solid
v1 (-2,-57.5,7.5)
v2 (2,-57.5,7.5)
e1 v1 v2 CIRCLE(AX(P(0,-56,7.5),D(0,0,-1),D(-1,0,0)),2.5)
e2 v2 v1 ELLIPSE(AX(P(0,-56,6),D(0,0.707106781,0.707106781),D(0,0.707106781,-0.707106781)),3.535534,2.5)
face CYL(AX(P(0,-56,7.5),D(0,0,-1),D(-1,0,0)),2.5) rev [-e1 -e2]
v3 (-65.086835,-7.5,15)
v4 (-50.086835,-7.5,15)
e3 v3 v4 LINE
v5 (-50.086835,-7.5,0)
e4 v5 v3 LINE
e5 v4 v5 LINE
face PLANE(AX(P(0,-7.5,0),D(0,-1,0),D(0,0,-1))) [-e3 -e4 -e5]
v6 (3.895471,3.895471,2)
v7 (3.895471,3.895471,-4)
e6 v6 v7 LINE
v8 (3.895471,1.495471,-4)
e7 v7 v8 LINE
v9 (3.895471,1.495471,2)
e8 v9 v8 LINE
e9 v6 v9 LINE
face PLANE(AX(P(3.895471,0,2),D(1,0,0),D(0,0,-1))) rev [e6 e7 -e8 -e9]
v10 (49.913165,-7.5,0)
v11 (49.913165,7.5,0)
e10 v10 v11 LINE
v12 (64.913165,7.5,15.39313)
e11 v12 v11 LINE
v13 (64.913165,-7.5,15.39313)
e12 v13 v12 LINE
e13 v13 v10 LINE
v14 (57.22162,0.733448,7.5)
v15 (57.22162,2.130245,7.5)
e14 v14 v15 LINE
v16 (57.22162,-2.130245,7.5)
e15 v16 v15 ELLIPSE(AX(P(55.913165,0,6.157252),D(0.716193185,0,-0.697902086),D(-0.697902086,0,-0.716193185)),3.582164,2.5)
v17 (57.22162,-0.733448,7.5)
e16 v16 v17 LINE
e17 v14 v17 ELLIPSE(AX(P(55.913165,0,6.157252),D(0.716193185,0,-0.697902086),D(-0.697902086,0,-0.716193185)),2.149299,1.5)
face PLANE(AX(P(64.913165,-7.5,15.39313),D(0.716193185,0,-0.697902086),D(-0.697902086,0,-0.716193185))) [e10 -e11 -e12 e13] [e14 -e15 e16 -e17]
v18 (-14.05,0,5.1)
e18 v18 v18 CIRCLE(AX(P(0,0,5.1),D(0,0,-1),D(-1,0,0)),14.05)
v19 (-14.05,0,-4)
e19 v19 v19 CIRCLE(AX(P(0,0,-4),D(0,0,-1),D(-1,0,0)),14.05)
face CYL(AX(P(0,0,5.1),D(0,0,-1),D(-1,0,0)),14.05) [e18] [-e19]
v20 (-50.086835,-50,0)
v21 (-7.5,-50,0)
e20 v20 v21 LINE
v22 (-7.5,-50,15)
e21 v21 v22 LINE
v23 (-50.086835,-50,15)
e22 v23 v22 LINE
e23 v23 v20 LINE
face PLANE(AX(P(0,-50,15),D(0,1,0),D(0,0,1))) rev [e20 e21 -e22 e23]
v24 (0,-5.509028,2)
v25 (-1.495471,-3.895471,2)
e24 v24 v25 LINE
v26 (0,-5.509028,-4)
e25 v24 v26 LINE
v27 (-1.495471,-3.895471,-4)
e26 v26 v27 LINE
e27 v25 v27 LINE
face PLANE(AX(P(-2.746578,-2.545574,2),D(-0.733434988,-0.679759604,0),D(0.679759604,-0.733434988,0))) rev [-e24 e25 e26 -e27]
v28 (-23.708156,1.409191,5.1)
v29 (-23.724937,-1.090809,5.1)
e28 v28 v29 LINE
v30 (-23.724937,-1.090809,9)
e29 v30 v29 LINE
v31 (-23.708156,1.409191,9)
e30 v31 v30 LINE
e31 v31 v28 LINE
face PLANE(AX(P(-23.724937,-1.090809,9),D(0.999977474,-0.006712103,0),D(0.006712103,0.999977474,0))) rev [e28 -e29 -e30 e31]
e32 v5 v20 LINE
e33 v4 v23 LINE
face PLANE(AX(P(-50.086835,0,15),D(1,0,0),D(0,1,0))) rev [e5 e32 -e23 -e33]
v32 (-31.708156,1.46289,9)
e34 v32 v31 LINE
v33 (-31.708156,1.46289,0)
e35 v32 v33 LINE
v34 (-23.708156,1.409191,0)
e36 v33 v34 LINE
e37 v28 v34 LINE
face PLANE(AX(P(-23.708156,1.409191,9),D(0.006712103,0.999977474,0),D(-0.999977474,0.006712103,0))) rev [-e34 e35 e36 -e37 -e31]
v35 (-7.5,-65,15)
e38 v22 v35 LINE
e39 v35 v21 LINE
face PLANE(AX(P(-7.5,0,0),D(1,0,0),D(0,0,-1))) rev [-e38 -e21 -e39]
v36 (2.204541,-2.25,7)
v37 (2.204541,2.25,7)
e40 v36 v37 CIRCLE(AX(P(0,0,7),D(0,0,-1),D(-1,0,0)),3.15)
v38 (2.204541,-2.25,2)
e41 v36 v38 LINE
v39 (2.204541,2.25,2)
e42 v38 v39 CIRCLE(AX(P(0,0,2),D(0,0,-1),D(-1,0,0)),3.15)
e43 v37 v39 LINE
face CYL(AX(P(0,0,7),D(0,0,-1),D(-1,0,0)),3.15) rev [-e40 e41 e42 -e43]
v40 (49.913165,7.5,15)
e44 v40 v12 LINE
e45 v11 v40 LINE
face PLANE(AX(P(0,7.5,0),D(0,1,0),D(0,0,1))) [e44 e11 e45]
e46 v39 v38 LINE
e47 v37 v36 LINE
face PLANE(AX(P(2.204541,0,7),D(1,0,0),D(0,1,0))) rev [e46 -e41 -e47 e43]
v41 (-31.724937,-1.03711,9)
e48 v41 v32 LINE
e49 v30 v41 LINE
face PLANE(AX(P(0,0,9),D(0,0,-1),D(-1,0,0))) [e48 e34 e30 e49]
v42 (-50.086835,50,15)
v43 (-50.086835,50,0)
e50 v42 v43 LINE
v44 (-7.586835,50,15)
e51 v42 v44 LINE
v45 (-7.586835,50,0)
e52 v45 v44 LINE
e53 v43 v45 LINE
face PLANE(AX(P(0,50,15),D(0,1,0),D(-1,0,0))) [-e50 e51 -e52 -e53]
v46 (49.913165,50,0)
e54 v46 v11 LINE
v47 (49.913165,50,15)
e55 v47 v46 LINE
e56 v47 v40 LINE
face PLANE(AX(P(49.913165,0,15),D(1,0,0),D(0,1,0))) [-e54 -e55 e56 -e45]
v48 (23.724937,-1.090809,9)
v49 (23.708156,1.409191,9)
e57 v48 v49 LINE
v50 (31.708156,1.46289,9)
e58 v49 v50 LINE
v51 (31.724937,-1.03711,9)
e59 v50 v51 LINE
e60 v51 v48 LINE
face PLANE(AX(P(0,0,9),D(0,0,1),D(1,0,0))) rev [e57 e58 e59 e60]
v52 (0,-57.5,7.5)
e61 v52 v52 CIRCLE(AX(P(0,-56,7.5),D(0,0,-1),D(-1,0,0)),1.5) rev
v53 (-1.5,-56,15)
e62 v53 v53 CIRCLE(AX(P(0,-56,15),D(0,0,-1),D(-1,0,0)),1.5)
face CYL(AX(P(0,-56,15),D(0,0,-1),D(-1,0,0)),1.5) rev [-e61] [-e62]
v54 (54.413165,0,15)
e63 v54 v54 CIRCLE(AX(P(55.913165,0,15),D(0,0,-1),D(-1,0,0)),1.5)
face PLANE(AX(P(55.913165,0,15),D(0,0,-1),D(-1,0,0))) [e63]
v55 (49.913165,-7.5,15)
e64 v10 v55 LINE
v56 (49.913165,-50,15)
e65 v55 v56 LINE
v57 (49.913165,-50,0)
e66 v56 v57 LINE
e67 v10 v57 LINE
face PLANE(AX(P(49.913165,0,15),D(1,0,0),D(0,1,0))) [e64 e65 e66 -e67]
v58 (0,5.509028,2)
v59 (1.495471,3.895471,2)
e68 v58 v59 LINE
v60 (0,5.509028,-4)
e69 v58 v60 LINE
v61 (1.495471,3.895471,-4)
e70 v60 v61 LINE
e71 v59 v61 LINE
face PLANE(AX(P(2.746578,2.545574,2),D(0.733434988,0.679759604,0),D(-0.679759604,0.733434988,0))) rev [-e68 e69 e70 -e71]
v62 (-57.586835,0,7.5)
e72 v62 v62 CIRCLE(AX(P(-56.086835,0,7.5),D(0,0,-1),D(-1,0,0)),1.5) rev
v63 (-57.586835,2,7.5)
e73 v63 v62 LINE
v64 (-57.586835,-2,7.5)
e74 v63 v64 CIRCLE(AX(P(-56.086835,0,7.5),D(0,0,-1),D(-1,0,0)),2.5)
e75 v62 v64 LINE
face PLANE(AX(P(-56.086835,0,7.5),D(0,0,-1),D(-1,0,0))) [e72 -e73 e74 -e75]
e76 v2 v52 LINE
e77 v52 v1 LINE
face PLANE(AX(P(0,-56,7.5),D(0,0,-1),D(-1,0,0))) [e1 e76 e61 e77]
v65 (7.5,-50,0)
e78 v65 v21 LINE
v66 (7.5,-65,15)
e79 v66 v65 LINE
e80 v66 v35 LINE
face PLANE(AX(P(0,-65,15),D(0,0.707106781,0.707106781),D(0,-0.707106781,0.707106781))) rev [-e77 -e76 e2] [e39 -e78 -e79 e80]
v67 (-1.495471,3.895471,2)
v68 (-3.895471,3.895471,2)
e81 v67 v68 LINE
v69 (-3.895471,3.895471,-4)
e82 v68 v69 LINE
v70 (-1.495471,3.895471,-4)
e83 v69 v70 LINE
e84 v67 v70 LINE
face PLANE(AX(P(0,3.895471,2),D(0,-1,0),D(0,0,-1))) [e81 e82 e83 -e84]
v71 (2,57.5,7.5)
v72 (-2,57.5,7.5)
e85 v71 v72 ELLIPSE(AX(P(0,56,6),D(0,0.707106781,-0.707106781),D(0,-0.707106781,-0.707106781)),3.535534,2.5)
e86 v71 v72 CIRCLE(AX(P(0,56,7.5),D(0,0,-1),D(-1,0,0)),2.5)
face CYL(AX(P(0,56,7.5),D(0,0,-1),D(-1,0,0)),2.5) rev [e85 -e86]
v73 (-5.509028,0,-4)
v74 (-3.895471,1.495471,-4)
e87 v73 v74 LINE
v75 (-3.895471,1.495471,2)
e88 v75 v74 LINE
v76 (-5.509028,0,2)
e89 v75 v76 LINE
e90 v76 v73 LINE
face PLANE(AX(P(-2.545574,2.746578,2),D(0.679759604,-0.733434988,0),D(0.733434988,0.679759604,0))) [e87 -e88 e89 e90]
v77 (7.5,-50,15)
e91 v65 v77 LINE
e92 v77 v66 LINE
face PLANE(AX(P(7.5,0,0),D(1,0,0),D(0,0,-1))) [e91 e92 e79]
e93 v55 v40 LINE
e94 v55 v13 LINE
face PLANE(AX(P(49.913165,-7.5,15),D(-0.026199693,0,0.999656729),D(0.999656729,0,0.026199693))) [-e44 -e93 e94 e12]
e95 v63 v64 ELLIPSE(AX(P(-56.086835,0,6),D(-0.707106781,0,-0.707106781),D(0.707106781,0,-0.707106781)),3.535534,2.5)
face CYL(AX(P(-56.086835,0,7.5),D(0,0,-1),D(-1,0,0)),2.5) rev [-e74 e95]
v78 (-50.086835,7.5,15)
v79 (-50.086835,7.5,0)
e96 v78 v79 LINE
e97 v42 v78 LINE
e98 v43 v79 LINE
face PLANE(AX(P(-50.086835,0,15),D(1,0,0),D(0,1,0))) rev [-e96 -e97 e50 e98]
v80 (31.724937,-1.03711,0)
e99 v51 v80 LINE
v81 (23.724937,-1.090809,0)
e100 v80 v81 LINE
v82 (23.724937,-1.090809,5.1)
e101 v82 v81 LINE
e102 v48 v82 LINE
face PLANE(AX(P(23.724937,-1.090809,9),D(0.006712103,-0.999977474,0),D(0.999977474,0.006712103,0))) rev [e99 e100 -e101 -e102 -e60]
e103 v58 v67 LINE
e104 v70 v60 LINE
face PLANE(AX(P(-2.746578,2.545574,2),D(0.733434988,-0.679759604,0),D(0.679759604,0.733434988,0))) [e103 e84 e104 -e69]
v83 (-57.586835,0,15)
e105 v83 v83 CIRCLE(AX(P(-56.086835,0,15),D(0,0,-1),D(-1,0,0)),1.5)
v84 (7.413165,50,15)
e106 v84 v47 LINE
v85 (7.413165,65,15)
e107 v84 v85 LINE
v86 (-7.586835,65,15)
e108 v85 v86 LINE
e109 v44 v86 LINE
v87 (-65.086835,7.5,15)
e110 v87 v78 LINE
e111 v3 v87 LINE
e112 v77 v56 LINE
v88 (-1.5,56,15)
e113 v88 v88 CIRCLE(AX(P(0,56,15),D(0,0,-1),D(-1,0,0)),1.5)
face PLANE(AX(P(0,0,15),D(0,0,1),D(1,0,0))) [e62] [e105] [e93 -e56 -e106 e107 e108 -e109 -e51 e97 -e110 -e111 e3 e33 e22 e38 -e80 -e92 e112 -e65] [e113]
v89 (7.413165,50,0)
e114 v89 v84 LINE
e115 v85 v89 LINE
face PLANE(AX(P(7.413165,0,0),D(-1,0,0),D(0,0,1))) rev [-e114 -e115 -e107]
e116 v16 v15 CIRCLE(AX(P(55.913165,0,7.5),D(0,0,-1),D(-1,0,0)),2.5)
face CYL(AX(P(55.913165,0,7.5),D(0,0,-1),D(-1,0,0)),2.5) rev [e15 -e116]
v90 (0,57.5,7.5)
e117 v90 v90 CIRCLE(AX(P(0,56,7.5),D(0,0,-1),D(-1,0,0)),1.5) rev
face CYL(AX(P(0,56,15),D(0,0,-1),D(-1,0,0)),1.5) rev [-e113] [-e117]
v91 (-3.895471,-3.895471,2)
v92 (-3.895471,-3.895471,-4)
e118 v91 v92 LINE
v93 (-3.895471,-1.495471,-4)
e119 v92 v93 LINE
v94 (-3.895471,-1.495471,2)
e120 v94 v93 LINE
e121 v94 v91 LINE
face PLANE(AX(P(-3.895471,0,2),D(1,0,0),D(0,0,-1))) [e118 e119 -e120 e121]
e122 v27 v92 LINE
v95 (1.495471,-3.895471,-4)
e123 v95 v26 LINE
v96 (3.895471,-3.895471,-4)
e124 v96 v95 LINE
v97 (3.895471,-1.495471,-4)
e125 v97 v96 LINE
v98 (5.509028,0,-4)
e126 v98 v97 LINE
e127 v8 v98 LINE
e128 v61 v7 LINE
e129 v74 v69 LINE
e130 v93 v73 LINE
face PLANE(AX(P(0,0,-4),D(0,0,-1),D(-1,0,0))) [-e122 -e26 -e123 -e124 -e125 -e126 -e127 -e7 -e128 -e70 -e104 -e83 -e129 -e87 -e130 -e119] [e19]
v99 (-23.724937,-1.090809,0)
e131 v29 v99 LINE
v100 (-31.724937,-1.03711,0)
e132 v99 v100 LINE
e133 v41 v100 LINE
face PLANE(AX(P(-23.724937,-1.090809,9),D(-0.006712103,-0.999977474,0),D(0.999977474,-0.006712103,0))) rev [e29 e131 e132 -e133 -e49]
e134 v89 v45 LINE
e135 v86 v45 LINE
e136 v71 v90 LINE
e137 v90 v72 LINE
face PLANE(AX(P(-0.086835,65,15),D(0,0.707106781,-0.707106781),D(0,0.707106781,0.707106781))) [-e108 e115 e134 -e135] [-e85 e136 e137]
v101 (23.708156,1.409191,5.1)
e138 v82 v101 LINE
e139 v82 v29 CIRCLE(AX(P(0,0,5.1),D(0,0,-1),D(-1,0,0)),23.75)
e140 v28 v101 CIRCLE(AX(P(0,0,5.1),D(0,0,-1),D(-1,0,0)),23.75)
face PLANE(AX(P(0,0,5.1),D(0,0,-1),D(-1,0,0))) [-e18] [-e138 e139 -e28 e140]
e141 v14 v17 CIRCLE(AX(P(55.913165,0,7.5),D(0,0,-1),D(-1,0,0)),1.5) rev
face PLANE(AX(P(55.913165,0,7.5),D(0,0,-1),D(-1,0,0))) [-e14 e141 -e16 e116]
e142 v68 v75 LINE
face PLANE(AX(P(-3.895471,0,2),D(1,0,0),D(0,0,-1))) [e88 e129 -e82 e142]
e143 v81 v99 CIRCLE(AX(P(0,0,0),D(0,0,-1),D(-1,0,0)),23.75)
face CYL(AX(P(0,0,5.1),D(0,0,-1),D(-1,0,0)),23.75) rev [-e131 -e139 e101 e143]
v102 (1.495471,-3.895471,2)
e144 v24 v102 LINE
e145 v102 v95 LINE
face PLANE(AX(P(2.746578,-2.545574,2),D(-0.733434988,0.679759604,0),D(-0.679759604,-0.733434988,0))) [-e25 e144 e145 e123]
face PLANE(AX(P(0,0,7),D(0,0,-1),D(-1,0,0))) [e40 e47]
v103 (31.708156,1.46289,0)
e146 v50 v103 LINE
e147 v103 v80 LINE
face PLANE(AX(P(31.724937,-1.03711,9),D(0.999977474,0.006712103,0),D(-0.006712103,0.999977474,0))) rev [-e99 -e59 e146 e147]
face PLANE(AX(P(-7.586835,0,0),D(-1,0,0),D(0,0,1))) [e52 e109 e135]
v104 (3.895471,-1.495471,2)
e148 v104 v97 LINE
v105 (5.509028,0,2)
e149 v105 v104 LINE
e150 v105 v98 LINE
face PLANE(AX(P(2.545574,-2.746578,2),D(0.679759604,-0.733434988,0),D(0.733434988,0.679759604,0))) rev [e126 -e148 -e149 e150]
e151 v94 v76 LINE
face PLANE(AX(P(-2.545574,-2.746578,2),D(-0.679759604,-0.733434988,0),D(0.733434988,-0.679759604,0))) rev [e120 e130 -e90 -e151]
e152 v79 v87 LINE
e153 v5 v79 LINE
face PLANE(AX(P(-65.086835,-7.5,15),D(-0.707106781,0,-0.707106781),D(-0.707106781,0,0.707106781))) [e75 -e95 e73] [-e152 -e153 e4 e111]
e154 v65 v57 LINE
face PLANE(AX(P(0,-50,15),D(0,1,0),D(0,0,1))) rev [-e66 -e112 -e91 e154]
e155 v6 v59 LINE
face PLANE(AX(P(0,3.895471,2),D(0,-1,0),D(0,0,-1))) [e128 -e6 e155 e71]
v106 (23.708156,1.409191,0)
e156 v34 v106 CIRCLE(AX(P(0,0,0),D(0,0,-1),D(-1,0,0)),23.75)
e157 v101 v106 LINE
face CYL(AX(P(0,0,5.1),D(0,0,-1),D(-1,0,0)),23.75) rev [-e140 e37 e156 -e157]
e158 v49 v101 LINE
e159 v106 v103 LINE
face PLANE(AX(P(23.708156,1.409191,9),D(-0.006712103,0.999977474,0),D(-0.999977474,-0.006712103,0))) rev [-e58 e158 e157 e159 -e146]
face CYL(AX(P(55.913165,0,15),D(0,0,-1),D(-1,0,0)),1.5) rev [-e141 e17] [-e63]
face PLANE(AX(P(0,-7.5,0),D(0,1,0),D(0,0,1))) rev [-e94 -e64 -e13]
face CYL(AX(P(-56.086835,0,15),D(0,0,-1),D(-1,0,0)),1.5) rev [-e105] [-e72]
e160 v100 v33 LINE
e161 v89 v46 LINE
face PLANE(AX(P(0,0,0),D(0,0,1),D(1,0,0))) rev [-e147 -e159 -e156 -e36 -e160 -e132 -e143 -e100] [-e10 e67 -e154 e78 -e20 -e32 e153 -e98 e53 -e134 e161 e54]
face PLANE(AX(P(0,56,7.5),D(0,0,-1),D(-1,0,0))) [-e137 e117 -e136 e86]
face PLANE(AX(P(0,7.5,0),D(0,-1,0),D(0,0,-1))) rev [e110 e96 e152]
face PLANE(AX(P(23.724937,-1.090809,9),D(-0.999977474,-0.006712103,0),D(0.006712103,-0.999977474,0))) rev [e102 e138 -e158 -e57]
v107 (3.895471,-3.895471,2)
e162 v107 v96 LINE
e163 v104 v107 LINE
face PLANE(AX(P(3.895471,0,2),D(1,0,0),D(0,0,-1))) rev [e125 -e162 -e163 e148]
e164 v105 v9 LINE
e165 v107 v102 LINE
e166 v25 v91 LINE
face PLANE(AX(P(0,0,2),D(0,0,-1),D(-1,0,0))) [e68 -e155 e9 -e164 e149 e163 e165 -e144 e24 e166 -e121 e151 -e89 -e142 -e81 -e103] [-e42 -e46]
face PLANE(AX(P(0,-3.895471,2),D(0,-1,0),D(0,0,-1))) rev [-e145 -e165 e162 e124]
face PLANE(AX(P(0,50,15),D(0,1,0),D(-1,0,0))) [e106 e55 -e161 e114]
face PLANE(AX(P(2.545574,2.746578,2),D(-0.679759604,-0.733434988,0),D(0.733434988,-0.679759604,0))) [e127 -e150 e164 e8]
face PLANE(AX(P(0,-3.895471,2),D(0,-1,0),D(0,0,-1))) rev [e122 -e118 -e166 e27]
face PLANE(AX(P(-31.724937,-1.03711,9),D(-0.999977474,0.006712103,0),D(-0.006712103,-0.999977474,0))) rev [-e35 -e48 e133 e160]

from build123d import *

# Parameters (mm, degrees)
BOSS_EXTRU_1_DEPTH      = 15
BOSS_EXTRU_2_START      = -7.5
BOSS_EXTRU_2_DEPTH      = 14.913164891
BOSS_EXTRU_2_START_2    = -7.586835109
BOSS_EXTRU_2_2_DEPTH    = 0.086835109
BOSS_EXTRU_2_START_3    = 7.413164891
BOSS_EXTRU_2_3_DEPTH    = 0.086835109
BOSS_EXTRU_3_DEPTH      = 7.5
BOSS_EXTRU_3_DEPTH_BACK = 7.5
ESQUISSE6_R             = 1.5
ENL_V_MAT_EXTRU_1_DEPTH = 15
ESQUISSE7_R             = 2.5
ENL_V_MAT_EXTRU_2_DEPTH = 7.5
ESQUISSE8_R             = 23.75
ESQUISSE8_R_2           = 14.05
ENL_V_MAT_EXTRU_3_DEPTH = 5.1
ENL_V_MAT_EXTRU_4_DEPTH = 9
ESQUISSE15_W            = 7.790942256
ESQUISSE15_H            = 7.790942256
ESQUISSE15_R            = 3
ENL_V_MAT_EXTRU_5_DEPTH = 2
ENL_V_MAT_EXTRU_6_DEPTH = 5
BOSS_EXTRU_6_START      = 4
ESQUISSE18_R            = 14.05
BOSS_EXTRU_6_DEPTH      = 4


# Read off the part's stored shape, not the designer's step: Boss.-Extru.2
with BuildPart() as part:
    # Esquisse1 → Boss.-Extru.1 (new body)
    with BuildSketch(Plane.XY):
        Polygon((49.913164891, 50), (-50.086835109, 50), (-50.086835109, 0), (-50.086835109, -50), (49.913164891, -50), (49.913164891, 0), align=None)
    extrude(amount=BOSS_EXTRU_1_DEPTH)

    # Boss.-Extru.2 outline → Boss.-Extru.2 (add)
    with BuildSketch(Plane.YZ.offset(BOSS_EXTRU_2_START)):
        Polygon((50, 0), (65, 15), (50, 15), align=None)
        Polygon((-50, 0), (-50, 15), (-65, 15), align=None)
    extrude(amount=BOSS_EXTRU_2_DEPTH)

    # Boss.-Extru.2 2 outline → Boss.-Extru.2 2 (add)
    with BuildSketch(Plane.YZ.offset(BOSS_EXTRU_2_START_2)):
        Polygon((50, 0), (65, 15), (50, 15), align=None)
    extrude(amount=BOSS_EXTRU_2_2_DEPTH)

    # Boss.-Extru.2 3 outline → Boss.-Extru.2 3 (add)
    with BuildSketch(Plane.YZ.offset(BOSS_EXTRU_2_START_3)):
        Polygon((-50, 0), (-50, 15), (-65, 15), align=None)
    extrude(amount=BOSS_EXTRU_2_3_DEPTH)

    # Esquisse4 → Boss.-Extru.3 (add, two sides: drawn at the far end of the back side and taken through both)
    with BuildSketch(Plane(origin=(0, 0, 0), x_dir=(1, 0, 0), z_dir=(0, 1, 0)).offset(-BOSS_EXTRU_3_DEPTH_BACK)):
        Polygon((-50.086835109, 0), (-50.086835109, -15), (-65.086835109, -15), align=None)
        Polygon((49.913164891, 0), (49.913164891, -15), (64.913164891, -15.393130345), align=None)
    extrude(amount=BOSS_EXTRU_3_DEPTH + BOSS_EXTRU_3_DEPTH_BACK)

    # Esquisse6 → Enlèv. mat.-Extru.1 (cut)
    with BuildSketch(Plane(origin=(0, 0, 0), x_dir=(-1, 0, 0), z_dir=(0, 0, -1))):
        with Locations((0, -56)):
            Circle(ESQUISSE6_R)
        with Locations((56.086835109, 0)):
            Circle(ESQUISSE6_R)
        with Locations((0, 56)):
            Circle(ESQUISSE6_R)
        with Locations((-55.913164891, 0)):
            Circle(ESQUISSE6_R)
    extrude(amount=-ENL_V_MAT_EXTRU_1_DEPTH, mode=Mode.SUBTRACT)

    # Esquisse7 → Enlèv. mat.-Extru.2 (cut)
    with BuildSketch(Plane(origin=(0, 0, 0), x_dir=(-1, 0, 0), z_dir=(0, 0, -1))):
        with Locations((56.086835109, 0)):
            Circle(ESQUISSE7_R)
        with Locations((0, 56)):
            Circle(ESQUISSE7_R)
        with Locations((-55.913164891, 0)):
            Circle(ESQUISSE7_R)
        with Locations((0, -56)):
            Circle(ESQUISSE7_R)
    extrude(amount=-ENL_V_MAT_EXTRU_2_DEPTH, mode=Mode.SUBTRACT)

    # Esquisse8 → Enlèv. mat.-Extru.3 (cut)
    with BuildSketch(Plane(origin=(0, 0, 0), x_dir=(-1, 0, 0), z_dir=(0, 0, -1))):
        Circle(ESQUISSE8_R)
        Circle(ESQUISSE8_R_2, mode=Mode.SUBTRACT)
    extrude(amount=-ENL_V_MAT_EXTRU_3_DEPTH, mode=Mode.SUBTRACT)

    # Esquisse11 → Enlèv. mat.-Extru.4 (cut)
    with BuildSketch(Plane(origin=(0, 0, 0), x_dir=(-1, 0, 0), z_dir=(0, 0, -1))):
        Polygon((23.724937024, -1.090808521), (23.708156389, 1.409191479), (31.708156389, 1.462889508), (31.724937024, -1.037110492), align=None)
        Polygon((-31.724937024, -1.037110492), (-31.708156389, 1.462889508), (-23.708156389, 1.409191479), (-23.724937024, -1.090808521), align=None)
    extrude(amount=-ENL_V_MAT_EXTRU_4_DEPTH, mode=Mode.SUBTRACT)

    # Esquisse15 → Enlèv. mat.-Extru.5 (cut)
    # profile 1 of 7: a face of its own
    with BuildSketch(Plane(origin=(0, 0, 0), x_dir=(-1, 0, 0), z_dir=(0, 0, -1))):
        Polygon((0, 5.509028101), (-1.495471128, 3.895471128), (1.495471128, 3.895471128), align=None)
    # profile 2 of 7: a face of its own
    with BuildSketch(Plane(origin=(0, 0, 0), x_dir=(-1, 0, 0), z_dir=(0, 0, -1))):
        Polygon((-3.895471128, -1.495471128), (-3.895471128, 1.495471128), (-5.509028101, 0), align=None)
    # profile 3 of 7: a face of its own
    with BuildSketch(Plane(origin=(0, 0, 0), x_dir=(-1, 0, 0), z_dir=(0, 0, -1))):
        Polygon((1.495471128, -3.895471128), (-1.495471128, -3.895471128), (0, -5.509028101), align=None)
    # profile 4 of 7: a face of its own
    with BuildSketch(Plane(origin=(0, 0, 0), x_dir=(-1, 0, 0), z_dir=(0, 0, -1))):
        Polygon((5.509028101, 0), (3.895471128, 1.495471128), (3.895471128, -1.495471128), align=None)
    # profile 5 of 7: a face of its own
    with BuildSketch(Plane(origin=(0, 0, 0), x_dir=(-1, 0, 0), z_dir=(0, 0, -1))):
        Rectangle(ESQUISSE15_W, ESQUISSE15_H)
        Circle(ESQUISSE15_R, mode=Mode.SUBTRACT)
    # profile 6 of 7: a face of its own
    with BuildSketch(Plane(origin=(0, 0, 0), x_dir=(-1, 0, 0), z_dir=(0, 0, -1))):
        with BuildLine():
            ThreePointArc((3, 0), (0.776457135, 2.897777479), (-2.598076211, 1.5))
            Line((-2.598076211, 1.5), (-2.598076211, -1.5))
            ThreePointArc((-2.598076211, -1.5), (0.776457135, -2.897777479), (3, 0))
        make_face()
    # profile 7 of 7: a face of its own
    with BuildSketch(Plane(origin=(0, 0, 0), x_dir=(-1, 0, 0), z_dir=(0, 0, -1))):
        with BuildLine():
            Line((-2.598076211, -1.5), (-2.598076211, 1.5))
            ThreePointArc((-2.598076211, 1.5), (-3, 0), (-2.598076211, -1.5))
        make_face()
    extrude(amount=-ENL_V_MAT_EXTRU_5_DEPTH, mode=Mode.SUBTRACT)

    # Esquisse17 → Enlèv. mat.-Extru.6 (cut)
    with BuildSketch(Plane(origin=(0, 0, 2), x_dir=(-1, 0, 0), z_dir=(0, 0, -1))):
        with BuildLine():
            ThreePointArc((3.15, 0), (1.220286151, 2.904031975), (-2.204540769, 2.25))
            Line((-2.204540769, 2.25), (-2.204540769, -2.25))
            ThreePointArc((-2.204540769, -2.25), (1.220286151, -2.904031975), (3.15, 0))
        make_face()
    extrude(amount=-ENL_V_MAT_EXTRU_6_DEPTH, mode=Mode.SUBTRACT)

    # Esquisse18 → Boss.-Extru.6 (add)
    with BuildSketch(Plane(origin=(0, 0, 0), x_dir=(-1, 0, 0), z_dir=(0, 0, -1)).offset(BOSS_EXTRU_6_START)):
        Circle(ESQUISSE18_R)
        Polygon((0, 5.509028101), (1.495471128, 3.895471128), (3.895471128, 3.895471128), (3.895471128, 1.495471128), (5.509028101, 0), (3.895471128, -1.495471128), (3.895471128, -3.895471128), (1.495471128, -3.895471128), (0, -5.509028101), (-1.495471128, -3.895471128), (-3.895471128, -3.895471128), (-3.895471128, -1.495471128), (-5.509028101, 0), (-3.895471128, 1.495471128), (-3.895471128, 3.895471128), (-1.495471128, 3.895471128), align=None, mode=Mode.SUBTRACT)
    extrude(amount=-BOSS_EXTRU_6_DEPTH)


solid = part.part
